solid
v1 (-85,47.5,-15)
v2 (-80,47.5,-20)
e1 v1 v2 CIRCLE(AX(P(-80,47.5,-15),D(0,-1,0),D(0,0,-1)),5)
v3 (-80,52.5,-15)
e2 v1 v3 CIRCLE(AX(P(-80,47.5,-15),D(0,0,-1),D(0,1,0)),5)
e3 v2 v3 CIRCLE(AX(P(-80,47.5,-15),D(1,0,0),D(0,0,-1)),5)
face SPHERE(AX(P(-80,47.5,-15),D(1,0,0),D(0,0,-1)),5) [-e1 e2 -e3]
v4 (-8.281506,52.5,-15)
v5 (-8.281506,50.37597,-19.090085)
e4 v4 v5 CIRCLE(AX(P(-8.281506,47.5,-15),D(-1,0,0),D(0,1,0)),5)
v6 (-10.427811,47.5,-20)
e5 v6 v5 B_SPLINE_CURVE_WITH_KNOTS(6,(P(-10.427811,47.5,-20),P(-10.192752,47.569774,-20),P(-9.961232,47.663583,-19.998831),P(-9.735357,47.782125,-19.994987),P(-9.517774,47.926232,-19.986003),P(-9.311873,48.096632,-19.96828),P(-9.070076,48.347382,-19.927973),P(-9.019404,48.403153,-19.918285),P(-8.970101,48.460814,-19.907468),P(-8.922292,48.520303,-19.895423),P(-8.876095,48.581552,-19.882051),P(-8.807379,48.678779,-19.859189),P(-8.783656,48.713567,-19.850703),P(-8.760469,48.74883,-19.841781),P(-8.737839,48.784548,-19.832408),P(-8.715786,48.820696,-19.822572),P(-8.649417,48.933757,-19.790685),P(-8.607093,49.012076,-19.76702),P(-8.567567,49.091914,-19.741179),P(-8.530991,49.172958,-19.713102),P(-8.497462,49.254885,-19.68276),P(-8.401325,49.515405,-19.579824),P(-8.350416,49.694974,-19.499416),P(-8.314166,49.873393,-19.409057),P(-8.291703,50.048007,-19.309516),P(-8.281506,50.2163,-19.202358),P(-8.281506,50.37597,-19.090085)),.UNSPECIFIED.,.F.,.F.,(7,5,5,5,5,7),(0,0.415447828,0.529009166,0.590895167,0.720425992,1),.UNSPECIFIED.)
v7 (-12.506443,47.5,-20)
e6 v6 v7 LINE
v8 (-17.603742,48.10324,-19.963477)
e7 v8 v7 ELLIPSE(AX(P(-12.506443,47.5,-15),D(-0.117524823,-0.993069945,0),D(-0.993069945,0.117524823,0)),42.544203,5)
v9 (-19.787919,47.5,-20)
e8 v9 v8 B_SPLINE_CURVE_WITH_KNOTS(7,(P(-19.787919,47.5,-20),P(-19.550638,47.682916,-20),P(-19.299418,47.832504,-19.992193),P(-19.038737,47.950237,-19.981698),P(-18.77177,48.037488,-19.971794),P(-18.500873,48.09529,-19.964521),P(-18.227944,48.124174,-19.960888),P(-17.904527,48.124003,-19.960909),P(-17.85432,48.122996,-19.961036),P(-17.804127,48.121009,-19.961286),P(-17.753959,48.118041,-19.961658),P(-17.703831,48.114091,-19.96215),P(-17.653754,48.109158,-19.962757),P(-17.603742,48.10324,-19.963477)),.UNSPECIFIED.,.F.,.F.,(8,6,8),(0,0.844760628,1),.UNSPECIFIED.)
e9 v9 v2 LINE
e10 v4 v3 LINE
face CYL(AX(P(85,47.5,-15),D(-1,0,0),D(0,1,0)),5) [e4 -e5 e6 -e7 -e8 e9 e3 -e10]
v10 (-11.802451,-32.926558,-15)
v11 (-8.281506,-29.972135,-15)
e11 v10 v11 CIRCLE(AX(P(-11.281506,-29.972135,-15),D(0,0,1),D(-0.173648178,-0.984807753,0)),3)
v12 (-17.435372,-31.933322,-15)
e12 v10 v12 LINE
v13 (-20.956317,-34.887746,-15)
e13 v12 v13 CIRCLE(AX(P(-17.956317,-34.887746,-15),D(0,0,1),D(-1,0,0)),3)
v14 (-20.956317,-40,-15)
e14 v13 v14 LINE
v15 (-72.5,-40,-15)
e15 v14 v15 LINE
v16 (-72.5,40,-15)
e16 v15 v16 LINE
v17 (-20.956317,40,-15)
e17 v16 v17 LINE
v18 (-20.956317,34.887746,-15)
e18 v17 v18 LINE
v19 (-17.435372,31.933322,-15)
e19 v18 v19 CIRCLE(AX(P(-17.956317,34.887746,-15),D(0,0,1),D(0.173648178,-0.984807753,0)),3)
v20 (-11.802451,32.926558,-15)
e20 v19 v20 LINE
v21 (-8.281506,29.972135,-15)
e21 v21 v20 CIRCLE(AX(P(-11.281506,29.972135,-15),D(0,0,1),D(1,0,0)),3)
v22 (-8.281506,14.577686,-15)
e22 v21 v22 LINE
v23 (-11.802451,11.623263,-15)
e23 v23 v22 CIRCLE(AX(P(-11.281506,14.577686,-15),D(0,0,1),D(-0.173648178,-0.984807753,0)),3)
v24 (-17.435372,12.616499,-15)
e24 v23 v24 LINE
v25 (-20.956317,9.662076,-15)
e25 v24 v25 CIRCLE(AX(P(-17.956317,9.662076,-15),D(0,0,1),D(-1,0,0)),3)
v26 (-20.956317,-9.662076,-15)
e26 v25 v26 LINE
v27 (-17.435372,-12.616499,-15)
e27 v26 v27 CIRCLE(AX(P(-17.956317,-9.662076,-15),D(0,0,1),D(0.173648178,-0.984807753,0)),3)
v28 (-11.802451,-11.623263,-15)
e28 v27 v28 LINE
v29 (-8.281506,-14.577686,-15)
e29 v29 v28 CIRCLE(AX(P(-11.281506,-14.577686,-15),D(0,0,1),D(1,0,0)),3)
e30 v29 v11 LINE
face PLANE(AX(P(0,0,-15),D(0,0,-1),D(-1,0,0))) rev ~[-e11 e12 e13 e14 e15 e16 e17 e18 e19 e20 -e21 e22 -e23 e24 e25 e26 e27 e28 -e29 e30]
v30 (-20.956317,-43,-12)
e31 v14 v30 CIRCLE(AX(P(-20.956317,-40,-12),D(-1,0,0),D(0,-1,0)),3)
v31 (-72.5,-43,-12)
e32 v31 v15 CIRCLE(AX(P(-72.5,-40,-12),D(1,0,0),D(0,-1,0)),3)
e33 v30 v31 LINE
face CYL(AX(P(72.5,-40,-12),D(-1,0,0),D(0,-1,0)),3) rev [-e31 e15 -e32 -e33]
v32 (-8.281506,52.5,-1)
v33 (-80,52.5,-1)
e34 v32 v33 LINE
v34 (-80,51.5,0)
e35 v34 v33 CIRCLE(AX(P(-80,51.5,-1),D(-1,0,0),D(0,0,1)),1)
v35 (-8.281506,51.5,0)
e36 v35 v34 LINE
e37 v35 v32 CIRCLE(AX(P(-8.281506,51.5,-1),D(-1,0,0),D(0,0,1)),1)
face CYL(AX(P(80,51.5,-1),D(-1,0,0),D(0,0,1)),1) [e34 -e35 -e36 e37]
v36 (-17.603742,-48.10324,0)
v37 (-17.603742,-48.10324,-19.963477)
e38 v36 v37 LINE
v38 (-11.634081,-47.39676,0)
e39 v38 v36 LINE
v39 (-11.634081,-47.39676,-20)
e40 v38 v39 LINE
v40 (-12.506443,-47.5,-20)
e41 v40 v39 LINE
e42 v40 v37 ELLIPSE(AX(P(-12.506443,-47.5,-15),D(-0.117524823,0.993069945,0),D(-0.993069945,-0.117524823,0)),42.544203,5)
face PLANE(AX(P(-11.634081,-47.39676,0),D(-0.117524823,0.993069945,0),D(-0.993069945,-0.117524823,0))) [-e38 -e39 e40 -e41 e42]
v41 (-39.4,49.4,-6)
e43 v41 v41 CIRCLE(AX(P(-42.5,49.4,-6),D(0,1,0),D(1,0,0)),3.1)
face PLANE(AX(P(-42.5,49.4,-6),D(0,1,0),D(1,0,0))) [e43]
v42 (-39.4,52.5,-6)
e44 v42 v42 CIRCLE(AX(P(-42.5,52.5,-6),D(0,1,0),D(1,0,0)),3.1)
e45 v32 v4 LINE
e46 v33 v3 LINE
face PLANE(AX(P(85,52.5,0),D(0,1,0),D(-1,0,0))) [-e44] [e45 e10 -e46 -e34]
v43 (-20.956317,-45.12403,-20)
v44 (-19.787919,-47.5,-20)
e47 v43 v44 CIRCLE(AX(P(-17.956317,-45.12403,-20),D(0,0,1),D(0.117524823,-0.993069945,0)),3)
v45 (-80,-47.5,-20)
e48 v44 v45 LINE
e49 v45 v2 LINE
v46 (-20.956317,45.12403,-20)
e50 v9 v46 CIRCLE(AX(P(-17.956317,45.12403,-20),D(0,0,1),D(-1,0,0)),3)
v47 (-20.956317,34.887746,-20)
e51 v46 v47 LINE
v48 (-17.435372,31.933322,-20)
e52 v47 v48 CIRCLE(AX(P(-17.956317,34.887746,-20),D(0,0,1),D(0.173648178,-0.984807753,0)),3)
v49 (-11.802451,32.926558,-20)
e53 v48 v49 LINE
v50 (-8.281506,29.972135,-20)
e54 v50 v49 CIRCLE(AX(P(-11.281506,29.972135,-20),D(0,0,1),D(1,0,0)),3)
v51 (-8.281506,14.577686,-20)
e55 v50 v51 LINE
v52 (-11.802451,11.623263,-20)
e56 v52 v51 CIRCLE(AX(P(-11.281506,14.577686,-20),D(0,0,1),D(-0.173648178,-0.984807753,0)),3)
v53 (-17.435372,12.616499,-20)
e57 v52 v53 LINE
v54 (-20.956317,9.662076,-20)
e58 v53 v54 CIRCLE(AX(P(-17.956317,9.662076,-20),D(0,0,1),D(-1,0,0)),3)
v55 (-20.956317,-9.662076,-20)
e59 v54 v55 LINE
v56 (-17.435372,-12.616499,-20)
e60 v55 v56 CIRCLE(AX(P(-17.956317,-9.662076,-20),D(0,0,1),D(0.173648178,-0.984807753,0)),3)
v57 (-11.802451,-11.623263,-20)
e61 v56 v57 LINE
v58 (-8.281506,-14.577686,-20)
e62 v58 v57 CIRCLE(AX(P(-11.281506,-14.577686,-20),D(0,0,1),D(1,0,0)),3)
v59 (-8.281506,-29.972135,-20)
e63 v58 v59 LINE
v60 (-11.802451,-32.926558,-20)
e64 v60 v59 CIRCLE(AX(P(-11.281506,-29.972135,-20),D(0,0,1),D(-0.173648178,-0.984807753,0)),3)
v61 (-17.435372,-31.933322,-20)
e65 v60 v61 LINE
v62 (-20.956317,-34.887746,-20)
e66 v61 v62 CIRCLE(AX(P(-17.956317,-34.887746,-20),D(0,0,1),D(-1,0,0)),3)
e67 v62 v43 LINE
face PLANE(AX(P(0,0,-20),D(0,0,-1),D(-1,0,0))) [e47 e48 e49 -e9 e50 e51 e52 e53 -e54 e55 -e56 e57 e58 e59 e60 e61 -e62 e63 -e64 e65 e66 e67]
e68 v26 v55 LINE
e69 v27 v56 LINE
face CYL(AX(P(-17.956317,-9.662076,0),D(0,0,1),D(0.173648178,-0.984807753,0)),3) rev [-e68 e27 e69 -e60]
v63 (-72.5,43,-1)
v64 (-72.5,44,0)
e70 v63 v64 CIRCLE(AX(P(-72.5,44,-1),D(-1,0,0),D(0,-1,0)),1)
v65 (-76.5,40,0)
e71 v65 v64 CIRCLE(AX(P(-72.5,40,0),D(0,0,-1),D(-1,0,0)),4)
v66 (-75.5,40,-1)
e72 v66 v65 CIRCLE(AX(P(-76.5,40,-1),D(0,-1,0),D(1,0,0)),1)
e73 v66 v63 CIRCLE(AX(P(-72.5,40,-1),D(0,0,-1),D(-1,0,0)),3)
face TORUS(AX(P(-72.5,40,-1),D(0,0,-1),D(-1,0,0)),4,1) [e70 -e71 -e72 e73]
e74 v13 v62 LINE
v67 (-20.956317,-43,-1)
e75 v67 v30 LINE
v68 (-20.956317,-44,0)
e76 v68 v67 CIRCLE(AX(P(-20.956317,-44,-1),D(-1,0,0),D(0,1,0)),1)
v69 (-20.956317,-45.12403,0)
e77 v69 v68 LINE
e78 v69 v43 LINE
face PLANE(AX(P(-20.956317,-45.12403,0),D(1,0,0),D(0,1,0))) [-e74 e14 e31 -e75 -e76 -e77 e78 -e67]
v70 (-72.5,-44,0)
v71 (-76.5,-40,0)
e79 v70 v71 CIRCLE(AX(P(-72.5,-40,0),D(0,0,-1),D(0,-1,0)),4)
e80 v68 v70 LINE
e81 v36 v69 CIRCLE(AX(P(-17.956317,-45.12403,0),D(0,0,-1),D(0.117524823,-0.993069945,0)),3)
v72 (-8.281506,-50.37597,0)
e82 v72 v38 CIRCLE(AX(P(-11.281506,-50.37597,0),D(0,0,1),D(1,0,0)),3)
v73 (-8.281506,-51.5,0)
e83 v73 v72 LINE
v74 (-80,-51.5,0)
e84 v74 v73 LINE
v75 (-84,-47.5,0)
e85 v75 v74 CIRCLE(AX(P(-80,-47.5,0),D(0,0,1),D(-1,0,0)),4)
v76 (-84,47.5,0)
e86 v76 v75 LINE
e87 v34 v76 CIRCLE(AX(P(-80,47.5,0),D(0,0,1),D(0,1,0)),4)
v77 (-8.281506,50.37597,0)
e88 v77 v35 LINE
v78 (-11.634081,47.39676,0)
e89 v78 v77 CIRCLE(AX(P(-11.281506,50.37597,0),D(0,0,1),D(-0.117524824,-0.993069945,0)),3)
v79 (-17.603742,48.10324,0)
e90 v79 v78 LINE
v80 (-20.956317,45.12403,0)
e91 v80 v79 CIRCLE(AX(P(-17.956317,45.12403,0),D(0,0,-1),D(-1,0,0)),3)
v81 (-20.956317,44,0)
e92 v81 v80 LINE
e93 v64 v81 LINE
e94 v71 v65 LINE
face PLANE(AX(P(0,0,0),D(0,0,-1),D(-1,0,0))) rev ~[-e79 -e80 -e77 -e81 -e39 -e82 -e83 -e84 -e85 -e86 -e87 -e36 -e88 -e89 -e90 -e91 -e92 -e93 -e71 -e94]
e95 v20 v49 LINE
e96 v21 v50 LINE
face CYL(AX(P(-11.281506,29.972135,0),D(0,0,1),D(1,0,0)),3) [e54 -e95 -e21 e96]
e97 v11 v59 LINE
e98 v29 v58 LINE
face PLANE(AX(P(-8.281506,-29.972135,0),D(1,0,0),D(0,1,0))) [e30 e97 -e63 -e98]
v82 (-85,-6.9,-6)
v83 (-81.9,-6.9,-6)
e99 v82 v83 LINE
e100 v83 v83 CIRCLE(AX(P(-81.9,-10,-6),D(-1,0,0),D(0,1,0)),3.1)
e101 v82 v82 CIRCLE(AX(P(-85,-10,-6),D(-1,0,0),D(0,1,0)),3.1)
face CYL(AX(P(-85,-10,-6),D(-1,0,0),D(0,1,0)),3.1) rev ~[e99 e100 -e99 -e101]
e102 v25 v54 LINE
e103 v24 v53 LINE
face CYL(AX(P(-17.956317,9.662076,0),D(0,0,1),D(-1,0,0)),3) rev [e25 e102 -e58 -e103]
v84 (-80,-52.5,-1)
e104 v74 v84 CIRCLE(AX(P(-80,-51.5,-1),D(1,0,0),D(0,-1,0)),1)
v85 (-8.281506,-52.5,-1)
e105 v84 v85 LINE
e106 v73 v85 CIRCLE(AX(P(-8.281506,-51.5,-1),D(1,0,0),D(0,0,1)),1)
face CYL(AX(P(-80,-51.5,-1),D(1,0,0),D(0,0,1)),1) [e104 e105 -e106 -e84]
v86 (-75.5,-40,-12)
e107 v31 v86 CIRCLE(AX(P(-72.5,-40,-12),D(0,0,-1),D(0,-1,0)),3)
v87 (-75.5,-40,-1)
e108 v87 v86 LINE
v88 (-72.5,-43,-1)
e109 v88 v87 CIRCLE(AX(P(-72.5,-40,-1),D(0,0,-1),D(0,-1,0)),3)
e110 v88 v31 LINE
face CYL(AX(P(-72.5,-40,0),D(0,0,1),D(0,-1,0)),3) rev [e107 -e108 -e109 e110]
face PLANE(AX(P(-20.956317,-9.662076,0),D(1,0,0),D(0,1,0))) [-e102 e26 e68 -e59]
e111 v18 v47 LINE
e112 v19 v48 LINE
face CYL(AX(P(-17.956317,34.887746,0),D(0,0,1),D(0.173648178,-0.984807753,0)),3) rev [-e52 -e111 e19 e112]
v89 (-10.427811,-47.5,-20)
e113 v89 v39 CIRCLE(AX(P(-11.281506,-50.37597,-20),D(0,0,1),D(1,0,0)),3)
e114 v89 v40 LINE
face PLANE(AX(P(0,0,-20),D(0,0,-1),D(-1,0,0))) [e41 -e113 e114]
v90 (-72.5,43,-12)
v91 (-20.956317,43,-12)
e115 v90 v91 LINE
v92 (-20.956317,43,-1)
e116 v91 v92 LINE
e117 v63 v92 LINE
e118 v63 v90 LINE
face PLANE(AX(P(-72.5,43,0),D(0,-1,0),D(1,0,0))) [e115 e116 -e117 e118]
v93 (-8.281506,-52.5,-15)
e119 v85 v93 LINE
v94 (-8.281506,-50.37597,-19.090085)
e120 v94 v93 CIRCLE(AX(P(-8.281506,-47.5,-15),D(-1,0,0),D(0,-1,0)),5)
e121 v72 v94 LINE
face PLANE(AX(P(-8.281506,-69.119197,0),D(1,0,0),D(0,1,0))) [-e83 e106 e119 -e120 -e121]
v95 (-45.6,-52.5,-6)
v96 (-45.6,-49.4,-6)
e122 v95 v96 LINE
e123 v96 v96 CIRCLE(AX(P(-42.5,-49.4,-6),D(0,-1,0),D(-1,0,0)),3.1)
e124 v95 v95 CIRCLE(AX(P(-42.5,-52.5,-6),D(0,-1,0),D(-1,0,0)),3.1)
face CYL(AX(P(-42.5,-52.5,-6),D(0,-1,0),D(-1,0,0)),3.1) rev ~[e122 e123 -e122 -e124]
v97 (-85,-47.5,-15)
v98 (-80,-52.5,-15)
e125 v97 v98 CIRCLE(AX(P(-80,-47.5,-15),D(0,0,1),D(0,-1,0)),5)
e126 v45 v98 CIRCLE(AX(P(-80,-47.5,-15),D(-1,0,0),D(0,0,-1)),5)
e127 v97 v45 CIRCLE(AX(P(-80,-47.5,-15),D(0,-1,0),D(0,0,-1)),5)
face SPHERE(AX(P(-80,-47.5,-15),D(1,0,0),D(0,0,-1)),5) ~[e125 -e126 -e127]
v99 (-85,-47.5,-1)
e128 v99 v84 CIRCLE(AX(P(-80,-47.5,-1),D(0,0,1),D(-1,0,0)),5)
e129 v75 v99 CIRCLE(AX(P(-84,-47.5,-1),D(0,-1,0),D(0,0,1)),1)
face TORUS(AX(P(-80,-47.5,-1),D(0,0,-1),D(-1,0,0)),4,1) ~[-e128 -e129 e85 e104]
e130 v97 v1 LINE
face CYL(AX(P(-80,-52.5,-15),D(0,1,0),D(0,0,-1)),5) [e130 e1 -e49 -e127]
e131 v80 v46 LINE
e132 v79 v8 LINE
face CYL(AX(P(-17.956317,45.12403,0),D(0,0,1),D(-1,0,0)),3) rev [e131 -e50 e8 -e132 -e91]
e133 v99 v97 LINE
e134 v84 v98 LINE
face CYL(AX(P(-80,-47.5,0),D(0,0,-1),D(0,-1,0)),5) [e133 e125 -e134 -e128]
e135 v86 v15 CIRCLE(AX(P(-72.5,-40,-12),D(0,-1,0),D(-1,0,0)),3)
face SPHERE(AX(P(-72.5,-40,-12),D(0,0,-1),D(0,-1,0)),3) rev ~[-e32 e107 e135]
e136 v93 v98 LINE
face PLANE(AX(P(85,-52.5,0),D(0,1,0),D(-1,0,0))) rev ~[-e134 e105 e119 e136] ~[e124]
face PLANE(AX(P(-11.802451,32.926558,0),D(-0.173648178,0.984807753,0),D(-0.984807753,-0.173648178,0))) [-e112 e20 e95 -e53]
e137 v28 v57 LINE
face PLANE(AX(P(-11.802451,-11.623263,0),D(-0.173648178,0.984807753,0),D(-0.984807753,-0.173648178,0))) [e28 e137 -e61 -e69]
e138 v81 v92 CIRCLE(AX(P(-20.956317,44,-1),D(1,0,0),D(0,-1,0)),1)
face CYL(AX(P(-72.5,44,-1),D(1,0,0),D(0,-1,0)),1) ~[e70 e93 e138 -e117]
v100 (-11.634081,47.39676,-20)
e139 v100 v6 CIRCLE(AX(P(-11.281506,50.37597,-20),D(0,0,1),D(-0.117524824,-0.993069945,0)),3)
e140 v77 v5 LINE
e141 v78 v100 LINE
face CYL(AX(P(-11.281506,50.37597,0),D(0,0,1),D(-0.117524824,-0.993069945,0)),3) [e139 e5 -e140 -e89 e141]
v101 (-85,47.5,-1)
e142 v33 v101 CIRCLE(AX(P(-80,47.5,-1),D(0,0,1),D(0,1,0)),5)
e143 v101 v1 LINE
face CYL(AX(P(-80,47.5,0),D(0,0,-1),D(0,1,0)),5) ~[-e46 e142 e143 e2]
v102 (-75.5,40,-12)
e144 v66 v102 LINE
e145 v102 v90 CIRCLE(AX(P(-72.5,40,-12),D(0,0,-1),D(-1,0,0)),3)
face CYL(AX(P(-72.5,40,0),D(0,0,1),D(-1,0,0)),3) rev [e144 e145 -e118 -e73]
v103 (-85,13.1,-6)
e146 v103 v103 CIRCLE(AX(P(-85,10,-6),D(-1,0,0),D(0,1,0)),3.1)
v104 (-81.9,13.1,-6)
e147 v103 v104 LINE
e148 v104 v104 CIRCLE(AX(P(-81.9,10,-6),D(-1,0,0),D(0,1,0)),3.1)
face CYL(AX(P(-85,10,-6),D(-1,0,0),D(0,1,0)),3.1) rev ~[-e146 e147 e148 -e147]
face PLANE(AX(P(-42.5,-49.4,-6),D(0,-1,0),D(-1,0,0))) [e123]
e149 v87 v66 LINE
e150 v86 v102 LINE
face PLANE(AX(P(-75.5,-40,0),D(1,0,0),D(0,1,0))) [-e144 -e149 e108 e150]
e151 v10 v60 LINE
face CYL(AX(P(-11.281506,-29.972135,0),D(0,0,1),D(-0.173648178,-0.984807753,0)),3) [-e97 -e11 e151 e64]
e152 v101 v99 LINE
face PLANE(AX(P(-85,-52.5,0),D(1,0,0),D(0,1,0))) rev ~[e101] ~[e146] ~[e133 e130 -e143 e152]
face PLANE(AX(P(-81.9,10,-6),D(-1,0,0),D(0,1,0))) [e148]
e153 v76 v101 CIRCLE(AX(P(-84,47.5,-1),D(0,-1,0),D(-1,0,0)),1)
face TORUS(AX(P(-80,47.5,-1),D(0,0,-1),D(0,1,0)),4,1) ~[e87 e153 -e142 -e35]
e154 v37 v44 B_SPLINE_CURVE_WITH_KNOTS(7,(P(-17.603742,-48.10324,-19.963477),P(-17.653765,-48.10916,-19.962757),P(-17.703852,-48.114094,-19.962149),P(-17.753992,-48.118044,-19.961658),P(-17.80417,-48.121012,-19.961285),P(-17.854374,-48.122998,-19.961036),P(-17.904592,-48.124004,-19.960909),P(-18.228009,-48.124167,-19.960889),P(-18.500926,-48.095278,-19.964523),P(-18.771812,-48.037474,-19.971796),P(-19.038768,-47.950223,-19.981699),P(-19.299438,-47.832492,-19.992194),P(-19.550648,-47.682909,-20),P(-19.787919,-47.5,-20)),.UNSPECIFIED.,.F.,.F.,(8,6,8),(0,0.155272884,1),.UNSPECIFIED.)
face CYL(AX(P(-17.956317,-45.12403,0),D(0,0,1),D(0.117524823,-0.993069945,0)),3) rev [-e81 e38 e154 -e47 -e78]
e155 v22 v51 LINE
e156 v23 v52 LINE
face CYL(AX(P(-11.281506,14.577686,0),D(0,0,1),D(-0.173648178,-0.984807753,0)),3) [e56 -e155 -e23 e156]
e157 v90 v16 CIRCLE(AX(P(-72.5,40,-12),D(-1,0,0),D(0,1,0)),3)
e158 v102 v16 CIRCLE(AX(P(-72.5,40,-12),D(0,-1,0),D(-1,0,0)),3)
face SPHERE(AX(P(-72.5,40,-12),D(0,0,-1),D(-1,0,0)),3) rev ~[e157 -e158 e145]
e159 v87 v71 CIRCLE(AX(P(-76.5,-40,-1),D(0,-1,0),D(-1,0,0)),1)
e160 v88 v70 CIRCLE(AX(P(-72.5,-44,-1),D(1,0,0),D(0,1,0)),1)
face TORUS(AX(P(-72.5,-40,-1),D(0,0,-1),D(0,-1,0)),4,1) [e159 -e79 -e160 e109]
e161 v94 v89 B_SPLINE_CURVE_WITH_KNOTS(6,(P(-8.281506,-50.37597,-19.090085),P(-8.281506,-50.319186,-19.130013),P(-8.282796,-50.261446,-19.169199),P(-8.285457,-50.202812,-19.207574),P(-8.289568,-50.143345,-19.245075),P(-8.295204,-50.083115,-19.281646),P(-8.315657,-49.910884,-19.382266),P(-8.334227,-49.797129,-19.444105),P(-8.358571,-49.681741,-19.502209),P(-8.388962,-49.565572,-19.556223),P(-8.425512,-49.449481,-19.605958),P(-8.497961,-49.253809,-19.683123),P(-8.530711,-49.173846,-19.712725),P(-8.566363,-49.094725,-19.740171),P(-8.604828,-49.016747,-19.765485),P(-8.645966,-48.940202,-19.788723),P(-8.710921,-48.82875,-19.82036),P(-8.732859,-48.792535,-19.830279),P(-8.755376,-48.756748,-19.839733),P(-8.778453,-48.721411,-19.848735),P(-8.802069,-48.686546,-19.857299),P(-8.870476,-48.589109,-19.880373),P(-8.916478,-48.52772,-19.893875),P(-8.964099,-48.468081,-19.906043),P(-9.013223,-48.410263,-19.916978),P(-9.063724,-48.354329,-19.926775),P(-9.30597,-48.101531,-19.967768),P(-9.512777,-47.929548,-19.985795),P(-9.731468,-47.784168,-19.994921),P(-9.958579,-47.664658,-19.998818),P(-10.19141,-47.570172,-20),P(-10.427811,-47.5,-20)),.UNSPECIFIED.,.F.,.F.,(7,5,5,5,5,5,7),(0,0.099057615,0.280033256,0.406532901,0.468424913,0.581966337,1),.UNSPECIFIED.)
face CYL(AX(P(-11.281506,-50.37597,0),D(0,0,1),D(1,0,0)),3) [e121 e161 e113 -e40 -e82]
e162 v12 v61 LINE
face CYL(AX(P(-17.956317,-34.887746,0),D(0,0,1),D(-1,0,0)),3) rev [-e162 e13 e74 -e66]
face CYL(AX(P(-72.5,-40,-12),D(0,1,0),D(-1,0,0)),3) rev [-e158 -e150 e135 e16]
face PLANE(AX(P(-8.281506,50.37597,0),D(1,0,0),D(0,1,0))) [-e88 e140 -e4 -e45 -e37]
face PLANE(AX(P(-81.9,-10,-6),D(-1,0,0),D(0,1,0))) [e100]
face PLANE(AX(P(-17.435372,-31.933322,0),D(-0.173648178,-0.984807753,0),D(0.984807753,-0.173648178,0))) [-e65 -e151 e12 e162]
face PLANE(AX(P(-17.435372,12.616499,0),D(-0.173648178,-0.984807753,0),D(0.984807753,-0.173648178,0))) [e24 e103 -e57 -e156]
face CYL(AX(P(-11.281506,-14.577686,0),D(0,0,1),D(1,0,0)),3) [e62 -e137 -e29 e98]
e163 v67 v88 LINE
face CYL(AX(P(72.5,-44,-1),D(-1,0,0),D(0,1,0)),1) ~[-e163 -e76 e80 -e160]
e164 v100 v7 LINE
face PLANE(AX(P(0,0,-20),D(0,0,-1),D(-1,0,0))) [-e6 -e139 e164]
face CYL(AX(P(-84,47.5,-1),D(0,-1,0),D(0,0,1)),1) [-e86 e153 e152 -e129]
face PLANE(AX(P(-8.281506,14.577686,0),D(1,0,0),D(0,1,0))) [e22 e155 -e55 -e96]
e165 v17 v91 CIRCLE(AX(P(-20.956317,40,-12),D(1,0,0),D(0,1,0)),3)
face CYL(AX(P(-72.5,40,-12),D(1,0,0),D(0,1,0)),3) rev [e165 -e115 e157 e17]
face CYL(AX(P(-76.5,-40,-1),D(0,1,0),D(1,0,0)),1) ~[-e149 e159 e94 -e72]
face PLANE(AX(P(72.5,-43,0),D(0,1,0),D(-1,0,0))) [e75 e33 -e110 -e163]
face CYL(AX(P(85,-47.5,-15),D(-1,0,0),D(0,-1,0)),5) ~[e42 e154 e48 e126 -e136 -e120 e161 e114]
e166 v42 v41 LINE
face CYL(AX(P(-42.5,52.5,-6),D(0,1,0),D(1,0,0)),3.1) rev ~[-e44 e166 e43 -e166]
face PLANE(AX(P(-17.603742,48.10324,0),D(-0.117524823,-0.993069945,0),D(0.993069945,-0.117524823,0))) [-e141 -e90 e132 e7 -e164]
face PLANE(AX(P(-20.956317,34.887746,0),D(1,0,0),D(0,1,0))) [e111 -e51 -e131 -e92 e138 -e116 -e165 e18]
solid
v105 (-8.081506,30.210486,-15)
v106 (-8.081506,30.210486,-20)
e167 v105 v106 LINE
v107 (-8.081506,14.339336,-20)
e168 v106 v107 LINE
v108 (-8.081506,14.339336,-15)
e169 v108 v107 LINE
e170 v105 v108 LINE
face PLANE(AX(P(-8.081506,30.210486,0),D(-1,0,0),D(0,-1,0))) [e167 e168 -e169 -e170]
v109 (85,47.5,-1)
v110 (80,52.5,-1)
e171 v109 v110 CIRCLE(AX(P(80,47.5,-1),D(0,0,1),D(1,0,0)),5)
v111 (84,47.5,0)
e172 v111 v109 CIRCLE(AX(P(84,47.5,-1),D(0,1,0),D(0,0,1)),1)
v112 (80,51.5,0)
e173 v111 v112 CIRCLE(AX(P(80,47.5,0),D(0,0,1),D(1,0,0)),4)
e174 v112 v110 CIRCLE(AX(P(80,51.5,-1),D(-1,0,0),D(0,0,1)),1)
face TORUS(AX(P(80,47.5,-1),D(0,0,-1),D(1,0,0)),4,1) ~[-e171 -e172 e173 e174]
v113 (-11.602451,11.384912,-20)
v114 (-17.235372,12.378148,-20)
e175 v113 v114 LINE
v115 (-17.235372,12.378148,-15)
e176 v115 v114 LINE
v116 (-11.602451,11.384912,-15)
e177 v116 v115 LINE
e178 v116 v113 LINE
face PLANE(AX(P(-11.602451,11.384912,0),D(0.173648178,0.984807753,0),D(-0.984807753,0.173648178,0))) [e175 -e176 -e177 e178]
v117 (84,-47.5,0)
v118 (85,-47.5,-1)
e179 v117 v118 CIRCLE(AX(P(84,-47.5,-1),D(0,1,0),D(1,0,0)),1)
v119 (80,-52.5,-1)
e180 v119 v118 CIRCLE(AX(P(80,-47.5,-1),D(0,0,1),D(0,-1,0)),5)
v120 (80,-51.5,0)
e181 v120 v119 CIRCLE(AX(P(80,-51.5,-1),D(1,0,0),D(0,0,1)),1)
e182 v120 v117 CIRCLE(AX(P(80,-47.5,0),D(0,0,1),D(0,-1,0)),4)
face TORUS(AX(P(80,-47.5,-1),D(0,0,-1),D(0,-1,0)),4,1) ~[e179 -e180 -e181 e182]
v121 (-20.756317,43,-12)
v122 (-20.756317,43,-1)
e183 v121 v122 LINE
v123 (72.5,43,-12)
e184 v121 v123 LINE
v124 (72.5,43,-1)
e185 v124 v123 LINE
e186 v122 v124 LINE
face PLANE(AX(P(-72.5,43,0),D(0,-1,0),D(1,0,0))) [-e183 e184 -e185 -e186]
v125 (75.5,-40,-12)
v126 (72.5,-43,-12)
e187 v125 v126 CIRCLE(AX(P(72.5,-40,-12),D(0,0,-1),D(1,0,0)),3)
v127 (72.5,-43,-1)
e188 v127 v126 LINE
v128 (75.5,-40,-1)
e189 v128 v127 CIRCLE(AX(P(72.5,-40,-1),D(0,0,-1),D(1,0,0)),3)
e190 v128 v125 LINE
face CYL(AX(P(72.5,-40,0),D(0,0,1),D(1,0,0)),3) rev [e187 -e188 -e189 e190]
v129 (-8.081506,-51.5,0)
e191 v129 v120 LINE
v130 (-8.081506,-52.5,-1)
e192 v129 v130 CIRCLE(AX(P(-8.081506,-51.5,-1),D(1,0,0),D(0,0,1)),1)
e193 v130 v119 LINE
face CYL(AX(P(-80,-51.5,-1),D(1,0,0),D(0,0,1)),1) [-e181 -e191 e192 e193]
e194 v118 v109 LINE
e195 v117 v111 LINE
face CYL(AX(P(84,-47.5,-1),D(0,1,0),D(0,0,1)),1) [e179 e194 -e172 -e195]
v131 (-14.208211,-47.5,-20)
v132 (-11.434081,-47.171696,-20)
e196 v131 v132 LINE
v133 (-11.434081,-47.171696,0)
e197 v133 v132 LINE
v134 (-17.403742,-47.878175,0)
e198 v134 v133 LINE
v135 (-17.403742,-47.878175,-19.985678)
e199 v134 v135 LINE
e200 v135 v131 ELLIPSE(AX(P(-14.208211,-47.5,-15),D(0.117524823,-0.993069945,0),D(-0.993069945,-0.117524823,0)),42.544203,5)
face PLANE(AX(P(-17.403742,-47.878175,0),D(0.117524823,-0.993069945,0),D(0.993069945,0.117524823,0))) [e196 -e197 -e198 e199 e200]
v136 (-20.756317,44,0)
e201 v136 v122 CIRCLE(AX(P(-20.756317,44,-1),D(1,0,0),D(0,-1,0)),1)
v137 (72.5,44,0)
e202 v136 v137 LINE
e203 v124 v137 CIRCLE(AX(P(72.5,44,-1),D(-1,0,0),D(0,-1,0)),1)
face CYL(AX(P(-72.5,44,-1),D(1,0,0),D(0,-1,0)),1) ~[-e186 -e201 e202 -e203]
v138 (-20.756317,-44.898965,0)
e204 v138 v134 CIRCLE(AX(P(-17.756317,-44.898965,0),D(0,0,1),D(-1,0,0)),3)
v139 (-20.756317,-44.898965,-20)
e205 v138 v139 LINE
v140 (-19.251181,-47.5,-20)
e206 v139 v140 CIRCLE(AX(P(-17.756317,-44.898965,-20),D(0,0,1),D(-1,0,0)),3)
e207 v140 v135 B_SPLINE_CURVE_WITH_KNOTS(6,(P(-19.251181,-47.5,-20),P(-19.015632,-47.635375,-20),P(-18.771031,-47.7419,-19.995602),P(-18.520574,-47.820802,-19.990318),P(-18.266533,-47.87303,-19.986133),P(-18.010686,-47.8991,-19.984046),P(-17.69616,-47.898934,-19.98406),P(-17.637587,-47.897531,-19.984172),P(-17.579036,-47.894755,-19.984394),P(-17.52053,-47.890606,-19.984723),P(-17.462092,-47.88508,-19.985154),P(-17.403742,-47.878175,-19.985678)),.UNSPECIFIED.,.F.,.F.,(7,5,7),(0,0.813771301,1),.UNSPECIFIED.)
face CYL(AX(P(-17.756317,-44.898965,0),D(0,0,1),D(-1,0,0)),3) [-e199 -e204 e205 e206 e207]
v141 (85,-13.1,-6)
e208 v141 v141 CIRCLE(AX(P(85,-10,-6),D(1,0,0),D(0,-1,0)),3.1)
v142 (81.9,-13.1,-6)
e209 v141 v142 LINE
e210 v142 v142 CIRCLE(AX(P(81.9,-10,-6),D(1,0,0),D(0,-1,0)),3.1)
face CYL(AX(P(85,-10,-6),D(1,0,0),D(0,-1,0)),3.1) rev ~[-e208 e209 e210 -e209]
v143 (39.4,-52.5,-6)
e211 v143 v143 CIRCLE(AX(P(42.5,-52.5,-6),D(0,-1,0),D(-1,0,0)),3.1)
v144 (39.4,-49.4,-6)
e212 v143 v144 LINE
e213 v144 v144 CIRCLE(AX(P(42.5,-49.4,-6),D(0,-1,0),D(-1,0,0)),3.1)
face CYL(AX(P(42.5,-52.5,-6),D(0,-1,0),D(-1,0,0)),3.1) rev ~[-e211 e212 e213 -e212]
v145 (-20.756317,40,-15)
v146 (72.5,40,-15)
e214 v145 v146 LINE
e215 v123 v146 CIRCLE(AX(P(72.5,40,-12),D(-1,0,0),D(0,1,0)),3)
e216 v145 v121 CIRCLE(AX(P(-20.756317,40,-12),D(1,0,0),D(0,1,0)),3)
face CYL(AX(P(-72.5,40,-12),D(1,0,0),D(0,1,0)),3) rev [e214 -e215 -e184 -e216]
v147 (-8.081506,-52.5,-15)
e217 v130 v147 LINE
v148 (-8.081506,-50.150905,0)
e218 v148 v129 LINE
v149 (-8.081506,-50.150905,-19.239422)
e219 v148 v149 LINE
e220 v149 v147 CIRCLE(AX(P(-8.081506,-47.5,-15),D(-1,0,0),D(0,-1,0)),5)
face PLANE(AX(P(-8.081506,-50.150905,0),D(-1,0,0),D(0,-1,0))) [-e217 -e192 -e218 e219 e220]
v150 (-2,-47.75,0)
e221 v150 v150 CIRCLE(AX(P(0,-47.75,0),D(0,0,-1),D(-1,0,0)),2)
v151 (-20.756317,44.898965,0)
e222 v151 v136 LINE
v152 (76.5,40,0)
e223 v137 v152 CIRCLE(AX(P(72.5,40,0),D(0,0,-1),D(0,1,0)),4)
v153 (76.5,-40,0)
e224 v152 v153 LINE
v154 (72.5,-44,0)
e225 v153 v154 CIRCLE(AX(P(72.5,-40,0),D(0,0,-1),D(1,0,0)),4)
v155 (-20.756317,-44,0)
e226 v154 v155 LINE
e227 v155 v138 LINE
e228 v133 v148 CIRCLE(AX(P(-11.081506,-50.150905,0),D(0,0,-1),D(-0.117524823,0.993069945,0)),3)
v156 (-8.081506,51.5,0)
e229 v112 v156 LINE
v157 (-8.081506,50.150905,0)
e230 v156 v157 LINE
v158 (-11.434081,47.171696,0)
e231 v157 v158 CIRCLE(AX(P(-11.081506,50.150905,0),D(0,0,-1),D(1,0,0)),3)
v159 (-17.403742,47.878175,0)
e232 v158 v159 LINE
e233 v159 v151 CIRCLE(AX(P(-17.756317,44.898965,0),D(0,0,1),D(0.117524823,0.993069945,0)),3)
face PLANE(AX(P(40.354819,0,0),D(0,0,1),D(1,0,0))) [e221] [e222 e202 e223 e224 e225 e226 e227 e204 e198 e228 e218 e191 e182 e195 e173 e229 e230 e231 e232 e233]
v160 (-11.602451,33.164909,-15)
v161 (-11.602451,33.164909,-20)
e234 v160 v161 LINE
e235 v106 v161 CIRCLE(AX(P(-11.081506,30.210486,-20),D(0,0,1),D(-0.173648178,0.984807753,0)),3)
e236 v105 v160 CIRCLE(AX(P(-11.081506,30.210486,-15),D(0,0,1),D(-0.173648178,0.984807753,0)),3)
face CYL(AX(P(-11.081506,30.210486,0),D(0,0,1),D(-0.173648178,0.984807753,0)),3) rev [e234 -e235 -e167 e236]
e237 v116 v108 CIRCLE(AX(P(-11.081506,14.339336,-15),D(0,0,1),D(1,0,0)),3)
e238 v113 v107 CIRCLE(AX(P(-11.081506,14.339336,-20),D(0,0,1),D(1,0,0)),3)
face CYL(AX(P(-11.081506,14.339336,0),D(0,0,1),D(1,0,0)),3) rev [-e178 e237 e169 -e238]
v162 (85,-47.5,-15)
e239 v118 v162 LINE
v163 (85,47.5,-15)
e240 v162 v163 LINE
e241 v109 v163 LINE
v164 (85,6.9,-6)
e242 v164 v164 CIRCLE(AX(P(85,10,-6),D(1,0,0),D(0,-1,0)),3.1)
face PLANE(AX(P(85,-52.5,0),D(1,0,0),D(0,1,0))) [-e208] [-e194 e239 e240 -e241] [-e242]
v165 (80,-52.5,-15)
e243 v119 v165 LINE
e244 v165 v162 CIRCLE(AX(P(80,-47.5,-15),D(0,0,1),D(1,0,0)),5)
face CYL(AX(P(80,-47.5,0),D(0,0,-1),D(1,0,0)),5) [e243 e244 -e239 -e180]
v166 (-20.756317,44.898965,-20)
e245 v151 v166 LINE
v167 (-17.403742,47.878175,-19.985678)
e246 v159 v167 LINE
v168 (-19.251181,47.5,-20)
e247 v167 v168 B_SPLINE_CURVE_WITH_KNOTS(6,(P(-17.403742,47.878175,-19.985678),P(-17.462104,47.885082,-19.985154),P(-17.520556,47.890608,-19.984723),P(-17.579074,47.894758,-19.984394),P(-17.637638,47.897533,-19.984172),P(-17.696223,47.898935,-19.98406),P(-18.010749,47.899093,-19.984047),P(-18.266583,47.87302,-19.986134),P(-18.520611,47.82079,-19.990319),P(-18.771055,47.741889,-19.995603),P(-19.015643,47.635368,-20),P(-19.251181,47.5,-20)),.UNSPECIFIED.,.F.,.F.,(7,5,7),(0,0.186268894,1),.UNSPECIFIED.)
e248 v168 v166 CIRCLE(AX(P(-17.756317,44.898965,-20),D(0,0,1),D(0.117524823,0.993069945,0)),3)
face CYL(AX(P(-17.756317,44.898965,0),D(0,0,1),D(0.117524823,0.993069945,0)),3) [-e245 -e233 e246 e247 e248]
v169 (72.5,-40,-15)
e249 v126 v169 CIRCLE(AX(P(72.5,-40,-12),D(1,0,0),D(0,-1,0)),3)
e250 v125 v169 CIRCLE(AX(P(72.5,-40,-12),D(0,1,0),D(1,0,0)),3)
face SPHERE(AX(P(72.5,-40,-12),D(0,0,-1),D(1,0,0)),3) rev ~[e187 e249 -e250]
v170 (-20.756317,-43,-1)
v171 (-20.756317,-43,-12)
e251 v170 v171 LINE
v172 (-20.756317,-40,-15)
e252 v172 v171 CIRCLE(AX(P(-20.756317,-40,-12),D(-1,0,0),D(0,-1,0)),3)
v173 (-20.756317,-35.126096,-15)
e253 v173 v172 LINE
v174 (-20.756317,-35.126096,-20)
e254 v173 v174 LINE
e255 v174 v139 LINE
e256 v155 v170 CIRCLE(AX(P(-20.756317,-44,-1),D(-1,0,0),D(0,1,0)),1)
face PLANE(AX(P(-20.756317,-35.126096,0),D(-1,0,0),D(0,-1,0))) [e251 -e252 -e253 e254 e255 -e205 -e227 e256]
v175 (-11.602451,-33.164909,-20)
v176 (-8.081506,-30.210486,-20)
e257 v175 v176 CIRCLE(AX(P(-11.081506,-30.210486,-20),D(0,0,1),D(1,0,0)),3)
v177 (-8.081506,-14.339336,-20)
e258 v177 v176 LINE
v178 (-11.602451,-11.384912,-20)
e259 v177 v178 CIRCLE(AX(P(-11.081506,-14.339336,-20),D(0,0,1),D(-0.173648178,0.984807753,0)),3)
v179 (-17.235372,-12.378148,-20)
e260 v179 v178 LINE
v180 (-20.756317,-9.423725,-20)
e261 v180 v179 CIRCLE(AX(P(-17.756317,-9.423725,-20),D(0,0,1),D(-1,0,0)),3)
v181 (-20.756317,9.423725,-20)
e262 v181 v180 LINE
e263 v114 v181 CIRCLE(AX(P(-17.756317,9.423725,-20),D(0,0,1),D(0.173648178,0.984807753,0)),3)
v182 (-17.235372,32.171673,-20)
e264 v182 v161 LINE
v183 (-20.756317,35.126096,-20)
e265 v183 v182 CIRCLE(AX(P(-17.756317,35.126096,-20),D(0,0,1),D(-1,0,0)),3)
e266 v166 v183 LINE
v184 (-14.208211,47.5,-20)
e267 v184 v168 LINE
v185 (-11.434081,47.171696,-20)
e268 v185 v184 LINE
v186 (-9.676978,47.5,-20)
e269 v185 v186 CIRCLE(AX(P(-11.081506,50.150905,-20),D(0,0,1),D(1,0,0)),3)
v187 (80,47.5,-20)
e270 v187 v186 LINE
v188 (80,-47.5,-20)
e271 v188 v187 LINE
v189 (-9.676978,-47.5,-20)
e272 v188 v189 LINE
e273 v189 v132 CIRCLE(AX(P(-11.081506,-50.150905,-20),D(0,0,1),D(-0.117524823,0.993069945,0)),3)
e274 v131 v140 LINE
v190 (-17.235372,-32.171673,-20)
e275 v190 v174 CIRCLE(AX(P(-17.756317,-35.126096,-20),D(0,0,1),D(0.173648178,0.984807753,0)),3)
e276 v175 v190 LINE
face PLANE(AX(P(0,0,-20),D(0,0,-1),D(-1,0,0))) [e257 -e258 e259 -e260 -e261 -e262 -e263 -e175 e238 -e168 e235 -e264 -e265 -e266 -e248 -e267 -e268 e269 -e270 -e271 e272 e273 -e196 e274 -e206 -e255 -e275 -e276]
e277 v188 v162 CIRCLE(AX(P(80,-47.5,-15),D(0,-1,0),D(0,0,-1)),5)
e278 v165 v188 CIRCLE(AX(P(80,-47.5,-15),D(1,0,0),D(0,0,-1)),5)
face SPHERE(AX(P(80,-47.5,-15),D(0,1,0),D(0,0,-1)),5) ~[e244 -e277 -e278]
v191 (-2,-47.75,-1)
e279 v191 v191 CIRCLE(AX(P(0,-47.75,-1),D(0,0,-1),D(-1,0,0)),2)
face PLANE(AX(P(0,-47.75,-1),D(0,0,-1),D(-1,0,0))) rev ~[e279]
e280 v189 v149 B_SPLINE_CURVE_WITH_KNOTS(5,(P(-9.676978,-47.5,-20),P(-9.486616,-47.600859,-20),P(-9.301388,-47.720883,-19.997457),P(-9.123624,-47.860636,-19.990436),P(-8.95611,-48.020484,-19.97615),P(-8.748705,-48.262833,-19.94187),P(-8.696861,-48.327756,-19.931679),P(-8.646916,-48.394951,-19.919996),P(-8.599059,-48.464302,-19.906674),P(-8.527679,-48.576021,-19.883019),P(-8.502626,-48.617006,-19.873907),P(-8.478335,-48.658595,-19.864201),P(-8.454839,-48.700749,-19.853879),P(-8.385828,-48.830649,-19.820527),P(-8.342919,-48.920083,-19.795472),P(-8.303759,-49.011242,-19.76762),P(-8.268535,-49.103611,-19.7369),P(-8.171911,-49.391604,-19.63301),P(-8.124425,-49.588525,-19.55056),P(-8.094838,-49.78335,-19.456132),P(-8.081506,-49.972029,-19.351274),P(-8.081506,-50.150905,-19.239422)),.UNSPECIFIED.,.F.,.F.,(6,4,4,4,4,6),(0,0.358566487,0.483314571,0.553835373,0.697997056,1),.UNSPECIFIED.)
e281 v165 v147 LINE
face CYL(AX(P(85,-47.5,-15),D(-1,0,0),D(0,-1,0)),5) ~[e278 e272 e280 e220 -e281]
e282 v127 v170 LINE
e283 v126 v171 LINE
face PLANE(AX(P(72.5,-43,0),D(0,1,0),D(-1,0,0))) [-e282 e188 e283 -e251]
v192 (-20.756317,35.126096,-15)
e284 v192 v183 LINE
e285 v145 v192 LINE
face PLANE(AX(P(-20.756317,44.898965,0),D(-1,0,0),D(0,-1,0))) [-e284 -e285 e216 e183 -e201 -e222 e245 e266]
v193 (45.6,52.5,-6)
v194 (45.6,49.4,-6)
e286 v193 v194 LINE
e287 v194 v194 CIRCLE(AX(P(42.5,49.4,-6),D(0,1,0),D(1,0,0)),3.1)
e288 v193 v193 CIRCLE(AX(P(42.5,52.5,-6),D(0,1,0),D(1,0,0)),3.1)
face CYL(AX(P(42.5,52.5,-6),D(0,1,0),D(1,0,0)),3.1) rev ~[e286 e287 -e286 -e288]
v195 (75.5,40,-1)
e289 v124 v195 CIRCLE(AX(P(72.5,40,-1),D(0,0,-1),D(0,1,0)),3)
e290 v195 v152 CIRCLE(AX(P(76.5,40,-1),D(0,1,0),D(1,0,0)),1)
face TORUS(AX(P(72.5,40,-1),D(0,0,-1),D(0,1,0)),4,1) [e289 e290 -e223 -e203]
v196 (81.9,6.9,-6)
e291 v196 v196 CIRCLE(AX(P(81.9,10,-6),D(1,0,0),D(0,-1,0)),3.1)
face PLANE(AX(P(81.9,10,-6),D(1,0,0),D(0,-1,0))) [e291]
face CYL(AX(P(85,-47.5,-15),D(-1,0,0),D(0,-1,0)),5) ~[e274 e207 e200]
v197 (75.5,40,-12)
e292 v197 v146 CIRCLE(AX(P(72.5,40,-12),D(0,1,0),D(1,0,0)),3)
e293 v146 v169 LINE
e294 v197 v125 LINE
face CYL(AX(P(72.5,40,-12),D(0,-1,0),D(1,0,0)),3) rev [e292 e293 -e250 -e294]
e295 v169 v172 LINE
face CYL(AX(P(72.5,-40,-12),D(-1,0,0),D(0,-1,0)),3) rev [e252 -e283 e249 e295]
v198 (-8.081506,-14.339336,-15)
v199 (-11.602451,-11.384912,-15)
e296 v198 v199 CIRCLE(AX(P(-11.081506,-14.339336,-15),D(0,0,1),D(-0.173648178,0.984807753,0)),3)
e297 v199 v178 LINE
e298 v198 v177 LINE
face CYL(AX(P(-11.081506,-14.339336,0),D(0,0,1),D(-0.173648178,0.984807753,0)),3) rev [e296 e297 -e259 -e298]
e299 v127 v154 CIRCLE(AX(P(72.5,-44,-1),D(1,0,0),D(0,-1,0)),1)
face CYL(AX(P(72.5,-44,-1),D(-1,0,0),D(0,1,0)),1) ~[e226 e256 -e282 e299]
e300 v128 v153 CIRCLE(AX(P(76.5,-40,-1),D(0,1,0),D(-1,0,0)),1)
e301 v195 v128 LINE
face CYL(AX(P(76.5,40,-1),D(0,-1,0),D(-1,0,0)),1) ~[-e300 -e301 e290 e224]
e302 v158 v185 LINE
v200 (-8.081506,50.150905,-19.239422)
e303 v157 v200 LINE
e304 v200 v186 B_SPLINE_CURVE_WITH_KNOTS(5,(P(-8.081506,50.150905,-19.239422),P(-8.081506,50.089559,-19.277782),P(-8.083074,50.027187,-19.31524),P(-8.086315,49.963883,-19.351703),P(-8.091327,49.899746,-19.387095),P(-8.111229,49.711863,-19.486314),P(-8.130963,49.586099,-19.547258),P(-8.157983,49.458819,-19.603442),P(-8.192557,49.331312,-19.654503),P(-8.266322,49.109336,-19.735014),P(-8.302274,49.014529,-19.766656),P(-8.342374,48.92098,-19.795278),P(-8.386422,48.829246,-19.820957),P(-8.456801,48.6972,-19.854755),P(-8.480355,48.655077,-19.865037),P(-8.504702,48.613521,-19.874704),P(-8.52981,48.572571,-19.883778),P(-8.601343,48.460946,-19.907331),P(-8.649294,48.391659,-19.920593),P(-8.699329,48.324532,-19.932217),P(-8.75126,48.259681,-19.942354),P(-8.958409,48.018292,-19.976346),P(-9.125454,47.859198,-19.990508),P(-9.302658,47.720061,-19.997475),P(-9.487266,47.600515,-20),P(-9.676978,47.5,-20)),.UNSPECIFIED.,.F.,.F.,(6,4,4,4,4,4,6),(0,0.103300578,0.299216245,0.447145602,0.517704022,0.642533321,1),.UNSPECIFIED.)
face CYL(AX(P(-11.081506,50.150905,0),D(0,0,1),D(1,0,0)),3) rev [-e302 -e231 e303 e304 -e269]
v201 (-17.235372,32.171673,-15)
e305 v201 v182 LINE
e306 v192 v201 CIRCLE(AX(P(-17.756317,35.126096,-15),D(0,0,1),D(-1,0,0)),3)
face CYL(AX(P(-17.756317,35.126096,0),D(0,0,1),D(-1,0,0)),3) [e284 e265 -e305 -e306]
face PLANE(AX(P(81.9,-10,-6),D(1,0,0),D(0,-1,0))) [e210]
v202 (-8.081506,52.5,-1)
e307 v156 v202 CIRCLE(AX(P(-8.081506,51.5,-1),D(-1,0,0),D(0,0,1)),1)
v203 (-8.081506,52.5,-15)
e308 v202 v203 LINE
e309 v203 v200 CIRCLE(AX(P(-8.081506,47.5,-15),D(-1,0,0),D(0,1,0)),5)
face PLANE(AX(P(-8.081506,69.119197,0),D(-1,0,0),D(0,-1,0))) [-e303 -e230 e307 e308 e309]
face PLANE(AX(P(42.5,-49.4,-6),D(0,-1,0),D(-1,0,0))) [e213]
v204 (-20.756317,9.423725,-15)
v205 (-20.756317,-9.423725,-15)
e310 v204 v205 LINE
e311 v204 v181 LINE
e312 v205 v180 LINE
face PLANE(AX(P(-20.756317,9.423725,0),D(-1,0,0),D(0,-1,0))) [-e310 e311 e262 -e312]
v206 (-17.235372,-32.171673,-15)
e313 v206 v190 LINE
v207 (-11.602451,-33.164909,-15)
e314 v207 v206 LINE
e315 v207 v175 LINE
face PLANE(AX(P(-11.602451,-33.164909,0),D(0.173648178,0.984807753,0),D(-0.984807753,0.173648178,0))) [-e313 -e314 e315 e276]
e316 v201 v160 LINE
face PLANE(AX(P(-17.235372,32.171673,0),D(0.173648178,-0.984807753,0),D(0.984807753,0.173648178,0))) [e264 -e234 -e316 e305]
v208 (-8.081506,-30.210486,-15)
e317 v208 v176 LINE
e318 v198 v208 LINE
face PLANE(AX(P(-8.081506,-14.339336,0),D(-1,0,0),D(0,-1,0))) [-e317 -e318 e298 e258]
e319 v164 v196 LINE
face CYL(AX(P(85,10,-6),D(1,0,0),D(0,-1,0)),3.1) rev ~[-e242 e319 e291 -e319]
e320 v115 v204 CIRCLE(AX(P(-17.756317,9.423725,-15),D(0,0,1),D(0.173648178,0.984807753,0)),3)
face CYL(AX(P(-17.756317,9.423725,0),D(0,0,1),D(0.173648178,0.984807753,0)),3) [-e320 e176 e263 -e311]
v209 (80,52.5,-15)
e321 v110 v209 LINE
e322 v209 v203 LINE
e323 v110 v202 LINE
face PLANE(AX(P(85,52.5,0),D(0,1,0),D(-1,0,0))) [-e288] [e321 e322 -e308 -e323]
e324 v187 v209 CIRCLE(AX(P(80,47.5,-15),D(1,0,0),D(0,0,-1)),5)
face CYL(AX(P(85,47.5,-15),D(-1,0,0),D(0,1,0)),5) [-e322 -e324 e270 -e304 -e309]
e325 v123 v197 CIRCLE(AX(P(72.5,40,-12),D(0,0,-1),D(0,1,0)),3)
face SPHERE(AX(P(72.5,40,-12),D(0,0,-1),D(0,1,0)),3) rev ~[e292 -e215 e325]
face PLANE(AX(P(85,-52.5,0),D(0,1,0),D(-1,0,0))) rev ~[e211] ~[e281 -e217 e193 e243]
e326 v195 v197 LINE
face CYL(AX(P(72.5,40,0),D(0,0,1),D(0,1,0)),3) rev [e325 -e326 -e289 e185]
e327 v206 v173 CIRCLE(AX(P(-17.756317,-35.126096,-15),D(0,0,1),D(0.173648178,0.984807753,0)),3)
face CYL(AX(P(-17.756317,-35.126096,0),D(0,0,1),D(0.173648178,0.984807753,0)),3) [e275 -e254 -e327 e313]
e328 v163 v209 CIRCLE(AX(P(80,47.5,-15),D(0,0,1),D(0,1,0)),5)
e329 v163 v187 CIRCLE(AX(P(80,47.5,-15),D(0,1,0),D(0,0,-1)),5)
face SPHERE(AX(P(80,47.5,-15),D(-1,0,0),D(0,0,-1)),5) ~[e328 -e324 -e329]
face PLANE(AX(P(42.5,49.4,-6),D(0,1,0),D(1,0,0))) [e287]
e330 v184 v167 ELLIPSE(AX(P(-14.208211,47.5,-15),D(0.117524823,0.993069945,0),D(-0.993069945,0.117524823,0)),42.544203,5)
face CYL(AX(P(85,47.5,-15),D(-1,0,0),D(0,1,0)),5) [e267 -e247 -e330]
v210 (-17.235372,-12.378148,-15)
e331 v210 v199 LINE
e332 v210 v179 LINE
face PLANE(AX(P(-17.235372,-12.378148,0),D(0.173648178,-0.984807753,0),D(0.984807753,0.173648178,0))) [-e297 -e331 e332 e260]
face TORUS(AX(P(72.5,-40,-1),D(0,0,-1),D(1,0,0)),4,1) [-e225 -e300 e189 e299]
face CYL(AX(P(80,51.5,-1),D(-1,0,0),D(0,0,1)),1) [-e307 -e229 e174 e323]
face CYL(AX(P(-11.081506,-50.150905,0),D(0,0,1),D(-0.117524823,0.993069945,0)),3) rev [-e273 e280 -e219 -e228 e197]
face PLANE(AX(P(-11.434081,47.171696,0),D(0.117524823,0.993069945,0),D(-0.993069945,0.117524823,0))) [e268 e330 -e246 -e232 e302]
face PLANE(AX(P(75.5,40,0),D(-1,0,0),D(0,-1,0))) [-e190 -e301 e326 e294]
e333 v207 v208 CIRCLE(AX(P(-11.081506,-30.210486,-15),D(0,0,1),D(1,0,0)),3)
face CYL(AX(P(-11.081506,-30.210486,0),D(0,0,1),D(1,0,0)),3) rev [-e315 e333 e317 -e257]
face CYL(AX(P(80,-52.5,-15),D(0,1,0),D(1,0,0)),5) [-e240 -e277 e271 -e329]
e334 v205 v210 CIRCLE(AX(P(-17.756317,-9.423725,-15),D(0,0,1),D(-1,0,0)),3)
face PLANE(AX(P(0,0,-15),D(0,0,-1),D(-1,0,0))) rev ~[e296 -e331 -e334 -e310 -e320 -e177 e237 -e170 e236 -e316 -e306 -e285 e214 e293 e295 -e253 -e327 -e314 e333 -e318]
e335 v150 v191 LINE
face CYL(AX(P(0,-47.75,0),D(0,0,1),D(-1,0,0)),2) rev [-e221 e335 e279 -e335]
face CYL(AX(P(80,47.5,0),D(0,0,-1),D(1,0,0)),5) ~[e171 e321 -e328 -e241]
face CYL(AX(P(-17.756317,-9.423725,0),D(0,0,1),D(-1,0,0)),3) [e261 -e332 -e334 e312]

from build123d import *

# Parameters (mm, degrees)
F0_W      = 170
F0_H      = 105
F0_R      = 2
F1_DEPTH  = 20
F2_DEPTH  = 15
F3_R      = 5
F4_R      = 3
F5_R      = 1
F6_R      = 3.1
F7_DEPTH  = 3.1
F8_R      = 3.1
F9_DEPTH  = 3.1
F10_R     = 3.1
F11_DEPTH = 3.1
F12_R     = 3.1
F13_DEPTH = 3.1
F14_DEPTH = 1
F15_ANGLE = 180
F17_DEPTH = 25
F18_DEPTH = 25


# Not quite as in the source:
# - a feature names something its author has since deleted; it is built from what else it names


with BuildPart() as f1:
    # F0 (on Top) → F1 (new body)
    with BuildSketch(Plane.XY):
        Rectangle(F0_W, F0_H)
        with Locations((0, -47.75)):
            Circle(F0_R, mode=Mode.SUBTRACT)
        with BuildLine():
            ThreePointArc((-75.5, 40), (-74.6213203436, 42.1213203436), (-72.5, 43))
            Line((-72.5, 43), (72.5, 43))
            ThreePointArc((72.5, 43), (74.6213203436, 42.1213203436), (75.5, 40))
            Line((75.5, 40), (75.5, -40))
            ThreePointArc((75.5, -40), (74.6213203436, -42.1213203436), (72.5, -43))
            Line((72.5, -43), (-72.5, -43))
            ThreePointArc((-72.5, -43), (-74.6213203436, -42.1213203436), (-75.5, -40))
            Line((-75.5, -40), (-75.5, 40))
        make_face(mode=Mode.SUBTRACT)
        with BuildLine():
            Line((72.5, 43), (-72.5, 43))
            ThreePointArc((-72.5, 43), (-74.6213203436, 42.1213203436), (-75.5, 40))
            Line((-75.5, 40), (-75.5, -40))
            ThreePointArc((-75.5, -40), (-74.6213203436, -42.1213203436), (-72.5, -43))
            Line((-72.5, -43), (72.5, -43))
            ThreePointArc((72.5, -43), (74.6213203436, -42.1213203436), (75.5, -40))
            Line((75.5, -40), (75.5, 40))
            ThreePointArc((75.5, 40), (74.6213203436, 42.1213203436), (72.5, 43))
        make_face()
        with Locations((0, -47.75)):
            Circle(F0_R)
    extrude(amount=F1_DEPTH)

    # F0 (on Top) → F2 (cut)
    with BuildSketch(Plane.XY):
        with BuildLine():
            Line((72.5, 43), (-72.5, 43))
            ThreePointArc((-72.5, 43), (-74.6213203436, 42.1213203436), (-75.5, 40))
            Line((-75.5, 40), (-75.5, -40))
            ThreePointArc((-75.5, -40), (-74.6213203436, -42.1213203436), (-72.5, -43))
            Line((-72.5, -43), (72.5, -43))
            ThreePointArc((72.5, -43), (74.6213203436, -42.1213203436), (75.5, -40))
            Line((75.5, -40), (75.5, 40))
            ThreePointArc((75.5, 40), (74.6213203436, 42.1213203436), (72.5, 43))
        make_face()
    extrude(amount=F2_DEPTH, mode=Mode.SUBTRACT)

    # F3
    f3_edges = [f1.edges().sort_by_distance(p)[0] for p in [
        (0, 52.5, 20),
        (-85, 0, 20),
        (0, -52.5, 20),
        (85, 0, 20),
        (85, 52.5, 10),
        (-85, 52.5, 10),
        (-85, -52.5, 10),
        (85, -52.5, 10),
    ]]
    fillet(f3_edges, radius=F3_R)

    # F4
    f4_edges = [f1.edges().sort_by_distance(p)[0] for p in [
        (0, 43, 15),
        (-74.62132, 42.12132, 15),
        (-75.5, 0, 15),
        (-74.62132, -42.12132, 15),
        (0, -43, 15),
        (74.62132, -42.12132, 15),
        (75.5, 0, 15),
        (74.62132, 42.12132, 15),
    ]]
    fillet(f4_edges, radius=F4_R)

    # F5
    f5_edges = [f1.edges().sort_by_distance(p)[0] for p in [
        (0, 52.5, 0),
        (83.535534, 51.035534, 0),
        (-83.535534, 51.035534, 0),
        (85, 0, 0),
        (-85, 0, 0),
        (83.535534, -51.035534, 0),
        (-83.535534, -51.035534, 0),
        (0, -52.5, 0),
        (0, 43, 0),
        (-74.62132, 42.12132, 0),
        (-75.5, 0, 0),
        (-74.62132, -42.12132, 0),
        (0, -43, 0),
        (74.62132, -42.12132, 0),
        (75.5, 0, 0),
        (74.62132, 42.12132, 0),
    ]]
    fillet(f5_edges, radius=F5_R)

    # F6 (on face) → F7 (cut)
    with BuildSketch(Plane.XZ.offset(52.5)):
        with Locations((42.5, 6)):
            Circle(F6_R)
        with Locations((-42.5, 6)):
            Circle(F6_R)
    extrude(amount=-F7_DEPTH, mode=Mode.SUBTRACT)

    # F8 (on face) → F9 (cut)
    with BuildSketch(Plane(origin=(0, 52.5, 0), x_dir=(-1, 0, 0), z_dir=(0, 1, 0))):
        with Locations((42.5, 6)):
            Circle(F8_R)
        with Locations((-42.5, 6)):
            Circle(F8_R)
    extrude(amount=-F9_DEPTH, mode=Mode.SUBTRACT)

    # F10 (on face) → F11 (cut)
    with BuildSketch(Plane(origin=(-85, 0, 0), x_dir=(0, -1, 0), z_dir=(-1, 0, 0))):
        with Locations((10, 6)):
            Circle(F10_R)
        with Locations((-10, 6)):
            Circle(F10_R)
    extrude(amount=-F11_DEPTH, mode=Mode.SUBTRACT)

    # F12 (on face) → F13 (cut)
    with BuildSketch(Plane.YZ.offset(85)):
        with Locations((10, 6)):
            Circle(F12_R)
        with Locations((-10, 6)):
            Circle(F12_R)
    extrude(amount=-F13_DEPTH, mode=Mode.SUBTRACT)

    # F0 (on Top) → F14 (cut)
    with BuildSketch(Plane.XY):
        with Locations((0, -47.75)):
            Circle(F0_R)
    extrude(amount=F14_DEPTH, mode=Mode.SUBTRACT)


with BuildPart() as f1_1:
    # F15: moved
    add(f1.part.rotate(Axis((0, 0, 0), (0, 1, 0)), F15_ANGLE))


with BuildPart() as f17:
    # F16 (on Top) → F17 (new body)
    with BuildSketch(Plane.XY):
        with BuildLine():
            Line((-20.9563169628, -9.6620759565), (-20.9563169628, 0))
            Line((-20.9563169628, 0), (-20.9563169628, 9.6620759565))
            ThreePointArc((-20.9563169628, 9.6620759565), (-19.8846797919, 11.9602092859), (-17.4353724298, 12.6164992155))
            Line((-17.4353724298, 12.6164992155), (-11.8024505631, 11.6232631102))
            ThreePointArc((-11.8024505631, 11.6232631102), (-9.3531432011, 12.2795530399), (-8.2815060301, 14.5776863693))
            Line((-8.2815060301, 14.5776863693), (-8.2815060301, 29.9721352199))
            ThreePointArc((-8.2815060301, 29.9721352199), (-9.3531432011, 32.2702685493), (-11.8024505631, 32.926558479))
            Line((-11.8024505631, 32.926558479), (-17.4353724298, 31.9333223736))
            ThreePointArc((-17.4353724298, 31.9333223736), (-19.8846797919, 32.5896123033), (-20.9563169628, 34.8877456327))
            Line((-20.9563169628, 34.8877456327), (-20.9563169628, 45.1240298712))
            ThreePointArc((-20.9563169628, 45.1240298712), (-19.9490884736, 47.3665422359), (-17.6037424924, 48.1032397065))
            Line((-17.6037424924, 48.1032397065), (-11.6340805006, 47.3967602935))
            ThreePointArc((-11.6340805006, 47.3967602935), (-9.2887345193, 48.1334577641), (-8.2815060301, 50.3759701288))
            Line((-8.2815060301, 50.3759701288), (-8.2815060301, 69.1191965569))
            Line((-8.2815060301, 69.1191965569), (-109.5252448242, 69.1191965569))
            Line((-109.5252448242, 69.1191965569), (-109.5252448242, 0))
            Line((-109.5252448242, 0), (-109.5252448242, -69.1191965569))
            Line((-109.5252448242, -69.1191965569), (-8.2815060301, -69.1191965569))
            Line((-8.2815060301, -69.1191965569), (-8.2815060301, -50.3759701288))
            ThreePointArc((-8.2815060301, -50.3759701288), (-9.2887345193, -48.1334577641), (-11.6340805006, -47.3967602935))
            Line((-11.6340805006, -47.3967602935), (-17.6037424924, -48.1032397065))
            ThreePointArc((-17.6037424924, -48.1032397065), (-19.9490884736, -47.3665422359), (-20.9563169628, -45.1240298712))
            Line((-20.9563169628, -45.1240298712), (-20.9563169628, -34.8877456327))
            ThreePointArc((-20.9563169628, -34.8877456327), (-19.8846797919, -32.5896123033), (-17.4353724298, -31.9333223736))
            Line((-17.4353724298, -31.9333223736), (-11.8024505631, -32.926558479))
            ThreePointArc((-11.8024505631, -32.926558479), (-9.3531432011, -32.2702685493), (-8.2815060301, -29.9721352199))
            Line((-8.2815060301, -29.9721352199), (-8.2815060301, -14.5776863693))
            ThreePointArc((-8.2815060301, -14.5776863693), (-9.3531432011, -12.2795530399), (-11.8024505631, -11.6232631102))
            Line((-11.8024505631, -11.6232631102), (-17.4353724298, -12.6164992155))
            ThreePointArc((-17.4353724298, -12.6164992155), (-19.8846797919, -11.9602092859), (-20.9563169628, -9.6620759565))
        make_face()
    extrude(amount=-F17_DEPTH)


with BuildPart() as f18:
    # F16 (on Top) → F18 (new body)
    with BuildSketch(Plane.XY):
        with BuildLine():
            Line((105.8235841181, 69.1191965569), (-8.0815060301, 69.1191965569))
            Line((-8.0815060301, 69.1191965569), (-8.0815060301, 50.1509054536))
            ThreePointArc((-8.0815060301, 50.1509054536), (-9.0887345193, 47.9083930889), (-11.4340805006, 47.1716956182))
            Line((-11.4340805006, 47.1716956182), (-17.4037424924, 47.8781750312))
            ThreePointArc((-17.4037424924, 47.8781750312), (-19.7490884736, 47.1414775606), (-20.7563169628, 44.8989651959))
            Line((-20.7563169628, 44.8989651959), (-20.7563169628, 35.1260963512))
            ThreePointArc((-20.7563169628, 35.1260963512), (-19.6846797919, 32.8279630218), (-17.2353724298, 32.1716730922))
            Line((-17.2353724298, 32.1716730922), (-11.6024505631, 33.1649091975))
            ThreePointArc((-11.6024505631, 33.1649091975), (-9.1531432011, 32.5086192678), (-8.0815060301, 30.2104859384))
            Line((-8.0815060301, 30.2104859384), (-8.0815060301, 14.3393356507))
            ThreePointArc((-8.0815060301, 14.3393356507), (-9.1531432011, 12.0412023214), (-11.6024505631, 11.3849123917))
            Line((-11.6024505631, 11.3849123917), (-17.2353724298, 12.378148497))
            ThreePointArc((-17.2353724298, 12.378148497), (-19.6846797919, 11.7218585673), (-20.7563169628, 9.423725238))
            Line((-20.7563169628, 9.423725238), (-20.7563169628, 0))
            Line((-20.7563169628, 0), (-20.7563169628, -9.423725238))
            ThreePointArc((-20.7563169628, -9.423725238), (-19.6846797919, -11.7218585673), (-17.2353724298, -12.378148497))
            Line((-17.2353724298, -12.378148497), (-11.6024505631, -11.3849123917))
            ThreePointArc((-11.6024505631, -11.3849123917), (-9.1531432011, -12.0412023214), (-8.0815060301, -14.3393356507))
            Line((-8.0815060301, -14.3393356507), (-8.0815060301, -30.2104859384))
            ThreePointArc((-8.0815060301, -30.2104859384), (-9.1531432011, -32.5086192678), (-11.6024505631, -33.1649091975))
            Line((-11.6024505631, -33.1649091975), (-17.2353724298, -32.1716730922))
            ThreePointArc((-17.2353724298, -32.1716730922), (-19.6846797919, -32.8279630218), (-20.7563169628, -35.1260963512))
            Line((-20.7563169628, -35.1260963512), (-20.7563169628, -44.8989651959))
            ThreePointArc((-20.7563169628, -44.8989651959), (-19.7490884736, -47.1414775606), (-17.4037424924, -47.8781750312))
            Line((-17.4037424924, -47.8781750312), (-11.4340805006, -47.1716956182))
            ThreePointArc((-11.4340805006, -47.1716956182), (-9.0887345193, -47.9083930889), (-8.0815060301, -50.1509054536))
            Line((-8.0815060301, -50.1509054536), (-8.0815060301, -69.1191965569))
            Line((-8.0815060301, -69.1191965569), (105.8235841181, -69.1191965569))
            Line((105.8235841181, -69.1191965569), (105.8235841181, 69.1191965569))
        make_face()
    extrude(amount=-F18_DEPTH)


with BuildPart() as f19_1:
    # F19: copy of F1
    add(f1_1.part)


with BuildPart() as f1_2:
    add(f1_1.part)

    # F20: intersect F17
    add(f17.part, mode=Mode.INTERSECT)


with BuildPart() as f18_1:
    add(f18.part)

    # F21: intersect F19_1
    add(f19_1.part, mode=Mode.INTERSECT)


solid = Compound([f1_2.part, f18_1.part])
